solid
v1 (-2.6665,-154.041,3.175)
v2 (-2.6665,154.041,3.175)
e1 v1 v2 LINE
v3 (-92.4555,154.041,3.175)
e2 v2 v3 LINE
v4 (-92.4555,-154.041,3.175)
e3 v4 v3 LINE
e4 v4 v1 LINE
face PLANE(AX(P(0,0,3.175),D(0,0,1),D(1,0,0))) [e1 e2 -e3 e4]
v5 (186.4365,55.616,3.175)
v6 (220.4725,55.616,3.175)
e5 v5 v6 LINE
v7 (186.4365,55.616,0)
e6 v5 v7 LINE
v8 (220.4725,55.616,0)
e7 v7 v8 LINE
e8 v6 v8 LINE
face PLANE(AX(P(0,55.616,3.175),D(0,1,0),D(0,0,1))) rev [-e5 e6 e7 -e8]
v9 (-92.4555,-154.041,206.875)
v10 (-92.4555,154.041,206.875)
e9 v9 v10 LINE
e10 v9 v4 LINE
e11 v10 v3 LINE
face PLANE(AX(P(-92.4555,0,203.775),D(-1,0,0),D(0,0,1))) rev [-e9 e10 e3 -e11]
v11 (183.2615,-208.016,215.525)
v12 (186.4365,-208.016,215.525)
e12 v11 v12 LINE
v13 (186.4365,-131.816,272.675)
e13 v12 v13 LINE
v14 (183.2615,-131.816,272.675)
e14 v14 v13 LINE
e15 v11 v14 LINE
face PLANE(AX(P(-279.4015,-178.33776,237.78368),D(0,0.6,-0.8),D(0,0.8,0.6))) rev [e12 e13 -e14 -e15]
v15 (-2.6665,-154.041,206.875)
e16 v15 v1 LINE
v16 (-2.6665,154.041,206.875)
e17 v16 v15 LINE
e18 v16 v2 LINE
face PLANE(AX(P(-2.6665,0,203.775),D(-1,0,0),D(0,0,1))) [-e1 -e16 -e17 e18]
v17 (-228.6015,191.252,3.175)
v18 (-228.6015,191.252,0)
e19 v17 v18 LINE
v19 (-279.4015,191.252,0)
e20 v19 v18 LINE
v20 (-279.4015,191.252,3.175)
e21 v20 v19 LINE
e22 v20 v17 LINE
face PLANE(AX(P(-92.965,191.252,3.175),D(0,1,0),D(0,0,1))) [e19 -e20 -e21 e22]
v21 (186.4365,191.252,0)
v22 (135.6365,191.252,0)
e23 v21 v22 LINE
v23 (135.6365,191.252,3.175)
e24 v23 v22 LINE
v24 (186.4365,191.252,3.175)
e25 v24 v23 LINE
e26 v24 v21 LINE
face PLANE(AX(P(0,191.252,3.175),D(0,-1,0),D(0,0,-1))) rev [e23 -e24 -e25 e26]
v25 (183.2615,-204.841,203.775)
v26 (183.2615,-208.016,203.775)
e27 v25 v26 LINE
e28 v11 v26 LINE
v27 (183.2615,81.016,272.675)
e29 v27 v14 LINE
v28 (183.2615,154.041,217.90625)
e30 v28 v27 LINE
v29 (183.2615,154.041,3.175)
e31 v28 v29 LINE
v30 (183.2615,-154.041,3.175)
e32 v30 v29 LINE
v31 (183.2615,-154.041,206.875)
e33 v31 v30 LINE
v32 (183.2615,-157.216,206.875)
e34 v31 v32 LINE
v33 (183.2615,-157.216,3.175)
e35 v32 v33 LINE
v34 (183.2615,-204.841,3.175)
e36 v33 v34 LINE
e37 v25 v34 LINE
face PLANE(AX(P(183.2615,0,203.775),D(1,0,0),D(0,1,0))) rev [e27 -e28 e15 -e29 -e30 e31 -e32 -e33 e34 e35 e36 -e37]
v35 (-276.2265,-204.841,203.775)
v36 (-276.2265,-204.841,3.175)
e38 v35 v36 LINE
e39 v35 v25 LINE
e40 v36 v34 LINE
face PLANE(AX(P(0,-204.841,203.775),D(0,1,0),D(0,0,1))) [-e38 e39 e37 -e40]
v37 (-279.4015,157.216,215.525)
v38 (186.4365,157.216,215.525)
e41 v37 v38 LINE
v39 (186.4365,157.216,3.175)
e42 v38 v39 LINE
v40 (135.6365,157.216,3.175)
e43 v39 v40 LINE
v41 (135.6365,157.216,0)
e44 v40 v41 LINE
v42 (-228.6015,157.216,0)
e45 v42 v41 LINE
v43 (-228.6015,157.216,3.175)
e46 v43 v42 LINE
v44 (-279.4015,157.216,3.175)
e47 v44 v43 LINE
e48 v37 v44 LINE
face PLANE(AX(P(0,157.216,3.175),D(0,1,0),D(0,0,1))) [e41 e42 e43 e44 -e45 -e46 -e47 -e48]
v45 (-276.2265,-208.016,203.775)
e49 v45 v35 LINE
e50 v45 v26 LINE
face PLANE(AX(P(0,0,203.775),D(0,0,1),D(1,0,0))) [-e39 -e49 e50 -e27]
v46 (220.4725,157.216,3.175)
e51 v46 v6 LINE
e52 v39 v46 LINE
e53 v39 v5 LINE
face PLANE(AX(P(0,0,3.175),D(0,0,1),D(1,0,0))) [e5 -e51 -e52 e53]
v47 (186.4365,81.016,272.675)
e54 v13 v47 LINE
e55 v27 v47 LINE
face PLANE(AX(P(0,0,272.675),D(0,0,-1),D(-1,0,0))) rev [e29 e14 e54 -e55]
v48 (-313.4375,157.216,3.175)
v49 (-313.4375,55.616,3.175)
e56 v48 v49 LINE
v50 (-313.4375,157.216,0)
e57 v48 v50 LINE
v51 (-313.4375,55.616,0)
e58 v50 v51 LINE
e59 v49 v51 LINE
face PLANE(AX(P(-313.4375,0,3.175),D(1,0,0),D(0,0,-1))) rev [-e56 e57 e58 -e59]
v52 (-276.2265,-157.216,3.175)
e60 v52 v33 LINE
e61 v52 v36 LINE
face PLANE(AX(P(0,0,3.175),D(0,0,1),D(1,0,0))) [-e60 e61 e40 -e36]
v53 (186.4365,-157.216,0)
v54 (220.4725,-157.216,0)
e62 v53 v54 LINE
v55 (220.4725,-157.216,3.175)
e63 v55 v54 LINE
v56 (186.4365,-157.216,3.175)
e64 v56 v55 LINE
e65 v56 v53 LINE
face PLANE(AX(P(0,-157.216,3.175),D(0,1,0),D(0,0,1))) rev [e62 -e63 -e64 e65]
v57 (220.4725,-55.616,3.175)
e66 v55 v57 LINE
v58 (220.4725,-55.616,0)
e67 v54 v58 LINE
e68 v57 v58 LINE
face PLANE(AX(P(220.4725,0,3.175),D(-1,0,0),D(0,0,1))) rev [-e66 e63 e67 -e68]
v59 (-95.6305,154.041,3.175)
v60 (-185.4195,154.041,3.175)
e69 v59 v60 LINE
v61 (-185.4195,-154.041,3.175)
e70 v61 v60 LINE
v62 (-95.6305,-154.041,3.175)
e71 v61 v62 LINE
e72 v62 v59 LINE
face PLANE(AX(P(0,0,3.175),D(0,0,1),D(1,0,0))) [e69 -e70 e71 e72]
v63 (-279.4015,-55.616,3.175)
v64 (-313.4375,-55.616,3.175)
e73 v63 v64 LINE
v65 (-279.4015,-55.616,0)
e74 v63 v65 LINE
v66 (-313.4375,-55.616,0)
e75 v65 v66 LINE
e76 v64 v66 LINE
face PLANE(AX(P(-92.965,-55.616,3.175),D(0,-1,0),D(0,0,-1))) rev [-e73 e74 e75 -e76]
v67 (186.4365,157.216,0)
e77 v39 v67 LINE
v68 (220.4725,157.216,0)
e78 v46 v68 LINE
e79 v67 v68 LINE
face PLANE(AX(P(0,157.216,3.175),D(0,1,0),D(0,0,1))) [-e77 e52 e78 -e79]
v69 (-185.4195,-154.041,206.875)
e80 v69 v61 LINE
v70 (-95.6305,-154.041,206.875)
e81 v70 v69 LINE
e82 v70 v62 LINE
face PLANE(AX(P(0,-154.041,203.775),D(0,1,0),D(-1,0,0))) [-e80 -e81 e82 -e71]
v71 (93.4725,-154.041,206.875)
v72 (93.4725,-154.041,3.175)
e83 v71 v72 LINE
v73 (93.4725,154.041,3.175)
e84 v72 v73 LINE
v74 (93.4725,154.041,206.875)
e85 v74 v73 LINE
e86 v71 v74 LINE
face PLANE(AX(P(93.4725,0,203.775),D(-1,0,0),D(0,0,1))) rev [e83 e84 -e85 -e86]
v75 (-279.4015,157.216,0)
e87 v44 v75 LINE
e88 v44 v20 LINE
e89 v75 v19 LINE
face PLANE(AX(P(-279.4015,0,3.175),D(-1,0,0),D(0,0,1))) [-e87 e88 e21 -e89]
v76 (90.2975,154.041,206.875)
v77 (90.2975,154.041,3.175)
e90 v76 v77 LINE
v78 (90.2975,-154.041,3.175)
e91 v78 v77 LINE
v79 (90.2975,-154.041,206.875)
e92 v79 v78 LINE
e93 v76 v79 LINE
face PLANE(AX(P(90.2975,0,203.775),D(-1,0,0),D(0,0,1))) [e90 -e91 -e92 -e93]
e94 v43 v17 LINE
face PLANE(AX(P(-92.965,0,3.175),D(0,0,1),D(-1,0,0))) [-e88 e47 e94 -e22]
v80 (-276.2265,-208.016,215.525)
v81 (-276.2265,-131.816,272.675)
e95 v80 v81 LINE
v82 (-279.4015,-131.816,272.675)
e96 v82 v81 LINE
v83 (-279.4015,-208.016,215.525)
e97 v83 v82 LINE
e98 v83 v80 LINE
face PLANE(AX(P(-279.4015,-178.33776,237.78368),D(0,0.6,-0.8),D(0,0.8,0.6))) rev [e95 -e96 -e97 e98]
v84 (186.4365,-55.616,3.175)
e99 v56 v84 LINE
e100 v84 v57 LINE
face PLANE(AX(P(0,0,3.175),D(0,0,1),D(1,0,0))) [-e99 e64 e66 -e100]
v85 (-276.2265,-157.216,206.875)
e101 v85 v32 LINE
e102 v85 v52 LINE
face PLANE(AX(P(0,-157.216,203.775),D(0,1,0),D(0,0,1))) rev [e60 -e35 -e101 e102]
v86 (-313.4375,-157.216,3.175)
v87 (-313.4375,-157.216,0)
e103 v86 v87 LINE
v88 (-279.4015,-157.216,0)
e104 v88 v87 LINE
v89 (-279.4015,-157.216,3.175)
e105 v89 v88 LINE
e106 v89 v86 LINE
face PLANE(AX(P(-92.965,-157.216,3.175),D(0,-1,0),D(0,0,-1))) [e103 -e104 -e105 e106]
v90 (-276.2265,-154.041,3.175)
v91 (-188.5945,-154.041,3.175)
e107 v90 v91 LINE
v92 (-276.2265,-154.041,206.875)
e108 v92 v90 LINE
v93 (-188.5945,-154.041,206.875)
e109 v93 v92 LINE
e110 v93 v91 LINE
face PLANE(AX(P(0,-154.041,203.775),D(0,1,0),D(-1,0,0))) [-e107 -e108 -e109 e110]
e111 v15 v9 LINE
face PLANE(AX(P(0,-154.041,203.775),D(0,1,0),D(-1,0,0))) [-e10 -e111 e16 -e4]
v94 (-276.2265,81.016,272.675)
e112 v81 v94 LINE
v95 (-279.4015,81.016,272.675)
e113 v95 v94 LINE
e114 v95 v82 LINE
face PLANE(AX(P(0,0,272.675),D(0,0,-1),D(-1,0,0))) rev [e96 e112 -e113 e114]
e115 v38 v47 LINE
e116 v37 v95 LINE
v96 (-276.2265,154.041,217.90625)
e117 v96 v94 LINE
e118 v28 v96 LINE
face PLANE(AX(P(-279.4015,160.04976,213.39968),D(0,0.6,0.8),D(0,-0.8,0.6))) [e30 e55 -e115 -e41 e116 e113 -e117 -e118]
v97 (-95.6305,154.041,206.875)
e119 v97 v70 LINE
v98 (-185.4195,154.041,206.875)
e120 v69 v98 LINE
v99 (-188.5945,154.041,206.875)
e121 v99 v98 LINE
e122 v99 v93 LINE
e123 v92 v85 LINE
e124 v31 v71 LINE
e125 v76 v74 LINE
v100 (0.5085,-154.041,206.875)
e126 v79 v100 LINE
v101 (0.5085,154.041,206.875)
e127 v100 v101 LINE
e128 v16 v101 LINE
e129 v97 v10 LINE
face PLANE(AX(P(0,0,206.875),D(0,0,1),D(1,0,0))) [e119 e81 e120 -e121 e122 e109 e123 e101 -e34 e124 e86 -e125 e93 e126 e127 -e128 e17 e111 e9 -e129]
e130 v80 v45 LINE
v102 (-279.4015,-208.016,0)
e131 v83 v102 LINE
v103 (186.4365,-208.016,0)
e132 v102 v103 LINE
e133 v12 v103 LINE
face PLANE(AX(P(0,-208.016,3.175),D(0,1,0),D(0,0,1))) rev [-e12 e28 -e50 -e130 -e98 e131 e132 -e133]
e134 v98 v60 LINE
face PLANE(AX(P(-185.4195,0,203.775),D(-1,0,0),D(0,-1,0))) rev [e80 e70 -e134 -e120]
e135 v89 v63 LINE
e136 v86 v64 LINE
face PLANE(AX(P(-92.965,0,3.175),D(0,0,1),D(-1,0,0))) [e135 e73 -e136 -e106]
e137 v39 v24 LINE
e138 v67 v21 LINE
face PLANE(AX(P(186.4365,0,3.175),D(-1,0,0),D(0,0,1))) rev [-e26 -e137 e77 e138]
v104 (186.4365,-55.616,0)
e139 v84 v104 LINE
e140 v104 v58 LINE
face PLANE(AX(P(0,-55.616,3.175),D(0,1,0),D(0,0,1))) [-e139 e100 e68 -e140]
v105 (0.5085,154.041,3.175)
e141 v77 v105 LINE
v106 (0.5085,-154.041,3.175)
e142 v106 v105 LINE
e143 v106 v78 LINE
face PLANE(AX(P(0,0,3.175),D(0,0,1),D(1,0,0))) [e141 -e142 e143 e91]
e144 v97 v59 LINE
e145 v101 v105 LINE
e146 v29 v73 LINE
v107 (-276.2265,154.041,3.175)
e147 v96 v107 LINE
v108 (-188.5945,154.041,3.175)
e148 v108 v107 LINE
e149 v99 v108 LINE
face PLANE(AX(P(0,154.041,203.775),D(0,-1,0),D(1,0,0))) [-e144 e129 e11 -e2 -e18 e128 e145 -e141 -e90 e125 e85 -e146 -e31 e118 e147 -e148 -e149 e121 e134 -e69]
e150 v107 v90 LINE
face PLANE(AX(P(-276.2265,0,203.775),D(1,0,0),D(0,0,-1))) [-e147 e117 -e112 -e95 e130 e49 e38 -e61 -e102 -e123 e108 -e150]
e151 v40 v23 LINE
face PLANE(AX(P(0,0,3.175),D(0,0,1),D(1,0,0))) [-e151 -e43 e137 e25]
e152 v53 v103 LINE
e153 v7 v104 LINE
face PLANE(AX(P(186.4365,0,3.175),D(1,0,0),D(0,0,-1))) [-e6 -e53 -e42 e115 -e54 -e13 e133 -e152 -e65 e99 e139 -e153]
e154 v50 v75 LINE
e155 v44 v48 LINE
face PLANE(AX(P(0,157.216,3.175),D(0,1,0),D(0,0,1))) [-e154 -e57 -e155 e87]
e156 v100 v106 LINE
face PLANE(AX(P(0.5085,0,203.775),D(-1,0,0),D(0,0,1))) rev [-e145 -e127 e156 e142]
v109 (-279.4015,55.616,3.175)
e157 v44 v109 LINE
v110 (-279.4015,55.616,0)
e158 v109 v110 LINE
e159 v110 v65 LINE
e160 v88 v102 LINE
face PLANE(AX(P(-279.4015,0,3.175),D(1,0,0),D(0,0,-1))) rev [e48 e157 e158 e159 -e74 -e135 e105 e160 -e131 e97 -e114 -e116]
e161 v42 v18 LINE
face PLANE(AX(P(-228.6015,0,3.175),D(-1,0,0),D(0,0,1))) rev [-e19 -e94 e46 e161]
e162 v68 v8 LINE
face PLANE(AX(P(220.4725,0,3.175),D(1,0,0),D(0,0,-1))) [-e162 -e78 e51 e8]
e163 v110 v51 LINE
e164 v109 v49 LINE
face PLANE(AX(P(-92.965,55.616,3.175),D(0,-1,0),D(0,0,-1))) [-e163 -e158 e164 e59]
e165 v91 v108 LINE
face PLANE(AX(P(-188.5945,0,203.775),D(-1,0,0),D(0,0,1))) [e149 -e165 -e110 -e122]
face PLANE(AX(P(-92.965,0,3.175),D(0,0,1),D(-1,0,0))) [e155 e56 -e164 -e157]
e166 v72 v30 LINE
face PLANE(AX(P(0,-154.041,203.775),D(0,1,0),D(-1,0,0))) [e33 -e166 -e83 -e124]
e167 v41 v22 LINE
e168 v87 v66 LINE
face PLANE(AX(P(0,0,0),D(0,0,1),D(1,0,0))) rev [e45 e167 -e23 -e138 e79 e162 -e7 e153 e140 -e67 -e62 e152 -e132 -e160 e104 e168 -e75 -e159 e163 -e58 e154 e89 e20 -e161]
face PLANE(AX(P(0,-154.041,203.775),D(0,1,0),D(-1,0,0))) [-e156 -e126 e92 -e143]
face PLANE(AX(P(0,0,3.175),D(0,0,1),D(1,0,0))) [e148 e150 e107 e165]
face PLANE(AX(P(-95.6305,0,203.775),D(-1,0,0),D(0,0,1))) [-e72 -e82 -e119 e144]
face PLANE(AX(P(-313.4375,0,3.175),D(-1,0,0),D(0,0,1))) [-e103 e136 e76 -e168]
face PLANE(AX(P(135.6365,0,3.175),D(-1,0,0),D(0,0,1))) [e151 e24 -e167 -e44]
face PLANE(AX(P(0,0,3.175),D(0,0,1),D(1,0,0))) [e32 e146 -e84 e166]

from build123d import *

# Parameters (mm, degrees)
SKETCH1_W           = 465.838
SKETCH1_H           = 365.232
BOSS_EXTRUDE1_DEPTH = 3.175
SKETCH2_W           = 465.838
SKETCH2_H           = 365.232
SKETCH2_W_2         = 89.789
SKETCH2_H_2         = 308.082
SKETCH2_W_3         = 87.632
SKETCH2_W_4         = 459.488
SKETCH2_H_3         = 47.625
BOSS_EXTRUDE2_DEPTH = 200.6
SKETCH5_W           = 89.789
SKETCH5_H           = 308.082
SKETCH5_W_2         = 87.632
BOSS_EXTRUDE5_DEPTH = 38.1
CUT_EXTRUDE2_DEPTH  = 35
BOSS_EXTRUDE6_DEPTH = 30.8
CUT_EXTRUDE3_DEPTH  = 579.469838561
SKETCH10_W          = 34.036
SKETCH10_H          = 101.6
SKETCH10_W_2        = 50.8
SKETCH10_H_2        = 34.036
BOSS_EXTRUDE7_DEPTH = 3.175


with BuildPart() as part:
    # Sketch1 → Boss-Extrude1 (new body)
    with BuildSketch(Plane.XY):
        with Locations((-46.4825, -25.4)):
            Rectangle(SKETCH1_W, SKETCH1_H)
    extrude(amount=BOSS_EXTRUDE1_DEPTH)

    # Sketch2 → Boss-Extrude2 (add)
    with BuildSketch(Plane.XY.offset(3.175)):
        with Locations((-46.4825, -25.4)):
            Rectangle(SKETCH2_W, SKETCH2_H)
        with Locations((138.367, 0)):
            Rectangle(SKETCH2_W_2, SKETCH2_H_2, mode=Mode.SUBTRACT)
        with Locations((45.403, 0)):
            Rectangle(SKETCH2_W_2, SKETCH2_H_2, mode=Mode.SUBTRACT)
        with Locations((-47.561, 0)):
            Rectangle(SKETCH2_W_2, SKETCH2_H_2, mode=Mode.SUBTRACT)
        with Locations((-140.525, 0)):
            Rectangle(SKETCH2_W_2, SKETCH2_H_2, mode=Mode.SUBTRACT)
        with Locations((-232.4105, 0)):
            Rectangle(SKETCH2_W_3, SKETCH2_H_2, mode=Mode.SUBTRACT)
        with Locations((-46.4825, -181.0285)):
            Rectangle(SKETCH2_W_4, SKETCH2_H_3, mode=Mode.SUBTRACT)
    extrude(amount=BOSS_EXTRUDE2_DEPTH)

    # Sketch5 → Boss-Extrude5 (add)
    with BuildSketch(Plane.XY.offset(203.775)):
        Polygon((186.4365, 157.216), (-279.4015, 157.216), (-279.4015, -208.016), (-276.2265, -208.016), (-276.2265, -157.216), (183.2615, -157.216), (183.2615, -208.016), (186.4365, -208.016), align=None)
        with Locations((-140.525, 0)):
            Rectangle(SKETCH5_W, SKETCH5_H, mode=Mode.SUBTRACT)
        with Locations((-47.561, 0)):
            Rectangle(SKETCH5_W, SKETCH5_H, mode=Mode.SUBTRACT)
        with Locations((45.403, 0)):
            Rectangle(SKETCH5_W, SKETCH5_H, mode=Mode.SUBTRACT)
        with Locations((138.367, 0)):
            Rectangle(SKETCH5_W, SKETCH5_H, mode=Mode.SUBTRACT)
        with Locations((-232.4105, 0)):
            Rectangle(SKETCH5_W_2, SKETCH5_H, mode=Mode.SUBTRACT)
    extrude(amount=BOSS_EXTRUDE5_DEPTH)

    # Sketch7 → Cut-Extrude2 (cut)
    with BuildSketch(Plane.XY.offset(241.875)):
        Polygon((-95.6305, -154.041), (-185.4195, -154.041), (-185.4195, 154.041), (-188.5945, 154.041), (-188.5945, -154.041), (-276.2265, -154.041), (-276.2265, -157.216), (183.2615, -157.216), (183.2615, -154.041), (93.4725, -154.041), (93.4725, 154.041), (90.2975, 154.041), (90.2975, -154.041), (0.5085, -154.041), (0.5085, 154.041), (-2.6665, 154.041), (-2.6665, -154.041), (-92.4555, -154.041), (-92.4555, 154.041), (-95.6305, 154.041), align=None)
    extrude(amount=-CUT_EXTRUDE2_DEPTH, mode=Mode.SUBTRACT)

    # Sketch8 → Boss-Extrude6 (add)
    with BuildSketch(Plane.XY.offset(241.875)):
        Polygon((183.2615, 154.041), (183.2615, -208.016), (186.4365, -208.016), (186.4365, 157.216), (-279.4015, 157.216), (-279.4015, -208.016), (-276.2265, -208.016), (-276.2265, 154.041), align=None)
    extrude(amount=BOSS_EXTRUDE6_DEPTH)

    # Sketch9 → Cut-Extrude3 (cut, through all)
    with BuildSketch(Plane(origin=(186.4365, 0, 0), x_dir=(0, 0, -1), z_dir=(1, 0, 0))):
        Polygon((-272.675, -208.016), (-215.525, -208.016), (-272.675, -131.816), align=None)
        Polygon((-272.675, 157.216), (-272.675, 81.016), (-215.525, 157.216), align=None)
    extrude(amount=-CUT_EXTRUDE3_DEPTH, mode=Mode.SUBTRACT)

    # Sketch10 → Boss-Extrude7 (add)
    with BuildSketch(Plane.XY):
        with Locations((203.4545, 106.416)):
            Rectangle(SKETCH10_W, SKETCH10_H)
        with Locations((161.0365, 174.234)):
            Rectangle(SKETCH10_W_2, SKETCH10_H_2)
        with Locations((203.4545, -106.416)):
            Rectangle(SKETCH10_W, SKETCH10_H)
    boss_extrude7 = extrude(amount=BOSS_EXTRUDE7_DEPTH)

    # Mirror1: Boss-Extrude7 across plane
    add(boss_extrude7.mirror(Plane.ZY.offset(46.4825)))


solid = part.part
